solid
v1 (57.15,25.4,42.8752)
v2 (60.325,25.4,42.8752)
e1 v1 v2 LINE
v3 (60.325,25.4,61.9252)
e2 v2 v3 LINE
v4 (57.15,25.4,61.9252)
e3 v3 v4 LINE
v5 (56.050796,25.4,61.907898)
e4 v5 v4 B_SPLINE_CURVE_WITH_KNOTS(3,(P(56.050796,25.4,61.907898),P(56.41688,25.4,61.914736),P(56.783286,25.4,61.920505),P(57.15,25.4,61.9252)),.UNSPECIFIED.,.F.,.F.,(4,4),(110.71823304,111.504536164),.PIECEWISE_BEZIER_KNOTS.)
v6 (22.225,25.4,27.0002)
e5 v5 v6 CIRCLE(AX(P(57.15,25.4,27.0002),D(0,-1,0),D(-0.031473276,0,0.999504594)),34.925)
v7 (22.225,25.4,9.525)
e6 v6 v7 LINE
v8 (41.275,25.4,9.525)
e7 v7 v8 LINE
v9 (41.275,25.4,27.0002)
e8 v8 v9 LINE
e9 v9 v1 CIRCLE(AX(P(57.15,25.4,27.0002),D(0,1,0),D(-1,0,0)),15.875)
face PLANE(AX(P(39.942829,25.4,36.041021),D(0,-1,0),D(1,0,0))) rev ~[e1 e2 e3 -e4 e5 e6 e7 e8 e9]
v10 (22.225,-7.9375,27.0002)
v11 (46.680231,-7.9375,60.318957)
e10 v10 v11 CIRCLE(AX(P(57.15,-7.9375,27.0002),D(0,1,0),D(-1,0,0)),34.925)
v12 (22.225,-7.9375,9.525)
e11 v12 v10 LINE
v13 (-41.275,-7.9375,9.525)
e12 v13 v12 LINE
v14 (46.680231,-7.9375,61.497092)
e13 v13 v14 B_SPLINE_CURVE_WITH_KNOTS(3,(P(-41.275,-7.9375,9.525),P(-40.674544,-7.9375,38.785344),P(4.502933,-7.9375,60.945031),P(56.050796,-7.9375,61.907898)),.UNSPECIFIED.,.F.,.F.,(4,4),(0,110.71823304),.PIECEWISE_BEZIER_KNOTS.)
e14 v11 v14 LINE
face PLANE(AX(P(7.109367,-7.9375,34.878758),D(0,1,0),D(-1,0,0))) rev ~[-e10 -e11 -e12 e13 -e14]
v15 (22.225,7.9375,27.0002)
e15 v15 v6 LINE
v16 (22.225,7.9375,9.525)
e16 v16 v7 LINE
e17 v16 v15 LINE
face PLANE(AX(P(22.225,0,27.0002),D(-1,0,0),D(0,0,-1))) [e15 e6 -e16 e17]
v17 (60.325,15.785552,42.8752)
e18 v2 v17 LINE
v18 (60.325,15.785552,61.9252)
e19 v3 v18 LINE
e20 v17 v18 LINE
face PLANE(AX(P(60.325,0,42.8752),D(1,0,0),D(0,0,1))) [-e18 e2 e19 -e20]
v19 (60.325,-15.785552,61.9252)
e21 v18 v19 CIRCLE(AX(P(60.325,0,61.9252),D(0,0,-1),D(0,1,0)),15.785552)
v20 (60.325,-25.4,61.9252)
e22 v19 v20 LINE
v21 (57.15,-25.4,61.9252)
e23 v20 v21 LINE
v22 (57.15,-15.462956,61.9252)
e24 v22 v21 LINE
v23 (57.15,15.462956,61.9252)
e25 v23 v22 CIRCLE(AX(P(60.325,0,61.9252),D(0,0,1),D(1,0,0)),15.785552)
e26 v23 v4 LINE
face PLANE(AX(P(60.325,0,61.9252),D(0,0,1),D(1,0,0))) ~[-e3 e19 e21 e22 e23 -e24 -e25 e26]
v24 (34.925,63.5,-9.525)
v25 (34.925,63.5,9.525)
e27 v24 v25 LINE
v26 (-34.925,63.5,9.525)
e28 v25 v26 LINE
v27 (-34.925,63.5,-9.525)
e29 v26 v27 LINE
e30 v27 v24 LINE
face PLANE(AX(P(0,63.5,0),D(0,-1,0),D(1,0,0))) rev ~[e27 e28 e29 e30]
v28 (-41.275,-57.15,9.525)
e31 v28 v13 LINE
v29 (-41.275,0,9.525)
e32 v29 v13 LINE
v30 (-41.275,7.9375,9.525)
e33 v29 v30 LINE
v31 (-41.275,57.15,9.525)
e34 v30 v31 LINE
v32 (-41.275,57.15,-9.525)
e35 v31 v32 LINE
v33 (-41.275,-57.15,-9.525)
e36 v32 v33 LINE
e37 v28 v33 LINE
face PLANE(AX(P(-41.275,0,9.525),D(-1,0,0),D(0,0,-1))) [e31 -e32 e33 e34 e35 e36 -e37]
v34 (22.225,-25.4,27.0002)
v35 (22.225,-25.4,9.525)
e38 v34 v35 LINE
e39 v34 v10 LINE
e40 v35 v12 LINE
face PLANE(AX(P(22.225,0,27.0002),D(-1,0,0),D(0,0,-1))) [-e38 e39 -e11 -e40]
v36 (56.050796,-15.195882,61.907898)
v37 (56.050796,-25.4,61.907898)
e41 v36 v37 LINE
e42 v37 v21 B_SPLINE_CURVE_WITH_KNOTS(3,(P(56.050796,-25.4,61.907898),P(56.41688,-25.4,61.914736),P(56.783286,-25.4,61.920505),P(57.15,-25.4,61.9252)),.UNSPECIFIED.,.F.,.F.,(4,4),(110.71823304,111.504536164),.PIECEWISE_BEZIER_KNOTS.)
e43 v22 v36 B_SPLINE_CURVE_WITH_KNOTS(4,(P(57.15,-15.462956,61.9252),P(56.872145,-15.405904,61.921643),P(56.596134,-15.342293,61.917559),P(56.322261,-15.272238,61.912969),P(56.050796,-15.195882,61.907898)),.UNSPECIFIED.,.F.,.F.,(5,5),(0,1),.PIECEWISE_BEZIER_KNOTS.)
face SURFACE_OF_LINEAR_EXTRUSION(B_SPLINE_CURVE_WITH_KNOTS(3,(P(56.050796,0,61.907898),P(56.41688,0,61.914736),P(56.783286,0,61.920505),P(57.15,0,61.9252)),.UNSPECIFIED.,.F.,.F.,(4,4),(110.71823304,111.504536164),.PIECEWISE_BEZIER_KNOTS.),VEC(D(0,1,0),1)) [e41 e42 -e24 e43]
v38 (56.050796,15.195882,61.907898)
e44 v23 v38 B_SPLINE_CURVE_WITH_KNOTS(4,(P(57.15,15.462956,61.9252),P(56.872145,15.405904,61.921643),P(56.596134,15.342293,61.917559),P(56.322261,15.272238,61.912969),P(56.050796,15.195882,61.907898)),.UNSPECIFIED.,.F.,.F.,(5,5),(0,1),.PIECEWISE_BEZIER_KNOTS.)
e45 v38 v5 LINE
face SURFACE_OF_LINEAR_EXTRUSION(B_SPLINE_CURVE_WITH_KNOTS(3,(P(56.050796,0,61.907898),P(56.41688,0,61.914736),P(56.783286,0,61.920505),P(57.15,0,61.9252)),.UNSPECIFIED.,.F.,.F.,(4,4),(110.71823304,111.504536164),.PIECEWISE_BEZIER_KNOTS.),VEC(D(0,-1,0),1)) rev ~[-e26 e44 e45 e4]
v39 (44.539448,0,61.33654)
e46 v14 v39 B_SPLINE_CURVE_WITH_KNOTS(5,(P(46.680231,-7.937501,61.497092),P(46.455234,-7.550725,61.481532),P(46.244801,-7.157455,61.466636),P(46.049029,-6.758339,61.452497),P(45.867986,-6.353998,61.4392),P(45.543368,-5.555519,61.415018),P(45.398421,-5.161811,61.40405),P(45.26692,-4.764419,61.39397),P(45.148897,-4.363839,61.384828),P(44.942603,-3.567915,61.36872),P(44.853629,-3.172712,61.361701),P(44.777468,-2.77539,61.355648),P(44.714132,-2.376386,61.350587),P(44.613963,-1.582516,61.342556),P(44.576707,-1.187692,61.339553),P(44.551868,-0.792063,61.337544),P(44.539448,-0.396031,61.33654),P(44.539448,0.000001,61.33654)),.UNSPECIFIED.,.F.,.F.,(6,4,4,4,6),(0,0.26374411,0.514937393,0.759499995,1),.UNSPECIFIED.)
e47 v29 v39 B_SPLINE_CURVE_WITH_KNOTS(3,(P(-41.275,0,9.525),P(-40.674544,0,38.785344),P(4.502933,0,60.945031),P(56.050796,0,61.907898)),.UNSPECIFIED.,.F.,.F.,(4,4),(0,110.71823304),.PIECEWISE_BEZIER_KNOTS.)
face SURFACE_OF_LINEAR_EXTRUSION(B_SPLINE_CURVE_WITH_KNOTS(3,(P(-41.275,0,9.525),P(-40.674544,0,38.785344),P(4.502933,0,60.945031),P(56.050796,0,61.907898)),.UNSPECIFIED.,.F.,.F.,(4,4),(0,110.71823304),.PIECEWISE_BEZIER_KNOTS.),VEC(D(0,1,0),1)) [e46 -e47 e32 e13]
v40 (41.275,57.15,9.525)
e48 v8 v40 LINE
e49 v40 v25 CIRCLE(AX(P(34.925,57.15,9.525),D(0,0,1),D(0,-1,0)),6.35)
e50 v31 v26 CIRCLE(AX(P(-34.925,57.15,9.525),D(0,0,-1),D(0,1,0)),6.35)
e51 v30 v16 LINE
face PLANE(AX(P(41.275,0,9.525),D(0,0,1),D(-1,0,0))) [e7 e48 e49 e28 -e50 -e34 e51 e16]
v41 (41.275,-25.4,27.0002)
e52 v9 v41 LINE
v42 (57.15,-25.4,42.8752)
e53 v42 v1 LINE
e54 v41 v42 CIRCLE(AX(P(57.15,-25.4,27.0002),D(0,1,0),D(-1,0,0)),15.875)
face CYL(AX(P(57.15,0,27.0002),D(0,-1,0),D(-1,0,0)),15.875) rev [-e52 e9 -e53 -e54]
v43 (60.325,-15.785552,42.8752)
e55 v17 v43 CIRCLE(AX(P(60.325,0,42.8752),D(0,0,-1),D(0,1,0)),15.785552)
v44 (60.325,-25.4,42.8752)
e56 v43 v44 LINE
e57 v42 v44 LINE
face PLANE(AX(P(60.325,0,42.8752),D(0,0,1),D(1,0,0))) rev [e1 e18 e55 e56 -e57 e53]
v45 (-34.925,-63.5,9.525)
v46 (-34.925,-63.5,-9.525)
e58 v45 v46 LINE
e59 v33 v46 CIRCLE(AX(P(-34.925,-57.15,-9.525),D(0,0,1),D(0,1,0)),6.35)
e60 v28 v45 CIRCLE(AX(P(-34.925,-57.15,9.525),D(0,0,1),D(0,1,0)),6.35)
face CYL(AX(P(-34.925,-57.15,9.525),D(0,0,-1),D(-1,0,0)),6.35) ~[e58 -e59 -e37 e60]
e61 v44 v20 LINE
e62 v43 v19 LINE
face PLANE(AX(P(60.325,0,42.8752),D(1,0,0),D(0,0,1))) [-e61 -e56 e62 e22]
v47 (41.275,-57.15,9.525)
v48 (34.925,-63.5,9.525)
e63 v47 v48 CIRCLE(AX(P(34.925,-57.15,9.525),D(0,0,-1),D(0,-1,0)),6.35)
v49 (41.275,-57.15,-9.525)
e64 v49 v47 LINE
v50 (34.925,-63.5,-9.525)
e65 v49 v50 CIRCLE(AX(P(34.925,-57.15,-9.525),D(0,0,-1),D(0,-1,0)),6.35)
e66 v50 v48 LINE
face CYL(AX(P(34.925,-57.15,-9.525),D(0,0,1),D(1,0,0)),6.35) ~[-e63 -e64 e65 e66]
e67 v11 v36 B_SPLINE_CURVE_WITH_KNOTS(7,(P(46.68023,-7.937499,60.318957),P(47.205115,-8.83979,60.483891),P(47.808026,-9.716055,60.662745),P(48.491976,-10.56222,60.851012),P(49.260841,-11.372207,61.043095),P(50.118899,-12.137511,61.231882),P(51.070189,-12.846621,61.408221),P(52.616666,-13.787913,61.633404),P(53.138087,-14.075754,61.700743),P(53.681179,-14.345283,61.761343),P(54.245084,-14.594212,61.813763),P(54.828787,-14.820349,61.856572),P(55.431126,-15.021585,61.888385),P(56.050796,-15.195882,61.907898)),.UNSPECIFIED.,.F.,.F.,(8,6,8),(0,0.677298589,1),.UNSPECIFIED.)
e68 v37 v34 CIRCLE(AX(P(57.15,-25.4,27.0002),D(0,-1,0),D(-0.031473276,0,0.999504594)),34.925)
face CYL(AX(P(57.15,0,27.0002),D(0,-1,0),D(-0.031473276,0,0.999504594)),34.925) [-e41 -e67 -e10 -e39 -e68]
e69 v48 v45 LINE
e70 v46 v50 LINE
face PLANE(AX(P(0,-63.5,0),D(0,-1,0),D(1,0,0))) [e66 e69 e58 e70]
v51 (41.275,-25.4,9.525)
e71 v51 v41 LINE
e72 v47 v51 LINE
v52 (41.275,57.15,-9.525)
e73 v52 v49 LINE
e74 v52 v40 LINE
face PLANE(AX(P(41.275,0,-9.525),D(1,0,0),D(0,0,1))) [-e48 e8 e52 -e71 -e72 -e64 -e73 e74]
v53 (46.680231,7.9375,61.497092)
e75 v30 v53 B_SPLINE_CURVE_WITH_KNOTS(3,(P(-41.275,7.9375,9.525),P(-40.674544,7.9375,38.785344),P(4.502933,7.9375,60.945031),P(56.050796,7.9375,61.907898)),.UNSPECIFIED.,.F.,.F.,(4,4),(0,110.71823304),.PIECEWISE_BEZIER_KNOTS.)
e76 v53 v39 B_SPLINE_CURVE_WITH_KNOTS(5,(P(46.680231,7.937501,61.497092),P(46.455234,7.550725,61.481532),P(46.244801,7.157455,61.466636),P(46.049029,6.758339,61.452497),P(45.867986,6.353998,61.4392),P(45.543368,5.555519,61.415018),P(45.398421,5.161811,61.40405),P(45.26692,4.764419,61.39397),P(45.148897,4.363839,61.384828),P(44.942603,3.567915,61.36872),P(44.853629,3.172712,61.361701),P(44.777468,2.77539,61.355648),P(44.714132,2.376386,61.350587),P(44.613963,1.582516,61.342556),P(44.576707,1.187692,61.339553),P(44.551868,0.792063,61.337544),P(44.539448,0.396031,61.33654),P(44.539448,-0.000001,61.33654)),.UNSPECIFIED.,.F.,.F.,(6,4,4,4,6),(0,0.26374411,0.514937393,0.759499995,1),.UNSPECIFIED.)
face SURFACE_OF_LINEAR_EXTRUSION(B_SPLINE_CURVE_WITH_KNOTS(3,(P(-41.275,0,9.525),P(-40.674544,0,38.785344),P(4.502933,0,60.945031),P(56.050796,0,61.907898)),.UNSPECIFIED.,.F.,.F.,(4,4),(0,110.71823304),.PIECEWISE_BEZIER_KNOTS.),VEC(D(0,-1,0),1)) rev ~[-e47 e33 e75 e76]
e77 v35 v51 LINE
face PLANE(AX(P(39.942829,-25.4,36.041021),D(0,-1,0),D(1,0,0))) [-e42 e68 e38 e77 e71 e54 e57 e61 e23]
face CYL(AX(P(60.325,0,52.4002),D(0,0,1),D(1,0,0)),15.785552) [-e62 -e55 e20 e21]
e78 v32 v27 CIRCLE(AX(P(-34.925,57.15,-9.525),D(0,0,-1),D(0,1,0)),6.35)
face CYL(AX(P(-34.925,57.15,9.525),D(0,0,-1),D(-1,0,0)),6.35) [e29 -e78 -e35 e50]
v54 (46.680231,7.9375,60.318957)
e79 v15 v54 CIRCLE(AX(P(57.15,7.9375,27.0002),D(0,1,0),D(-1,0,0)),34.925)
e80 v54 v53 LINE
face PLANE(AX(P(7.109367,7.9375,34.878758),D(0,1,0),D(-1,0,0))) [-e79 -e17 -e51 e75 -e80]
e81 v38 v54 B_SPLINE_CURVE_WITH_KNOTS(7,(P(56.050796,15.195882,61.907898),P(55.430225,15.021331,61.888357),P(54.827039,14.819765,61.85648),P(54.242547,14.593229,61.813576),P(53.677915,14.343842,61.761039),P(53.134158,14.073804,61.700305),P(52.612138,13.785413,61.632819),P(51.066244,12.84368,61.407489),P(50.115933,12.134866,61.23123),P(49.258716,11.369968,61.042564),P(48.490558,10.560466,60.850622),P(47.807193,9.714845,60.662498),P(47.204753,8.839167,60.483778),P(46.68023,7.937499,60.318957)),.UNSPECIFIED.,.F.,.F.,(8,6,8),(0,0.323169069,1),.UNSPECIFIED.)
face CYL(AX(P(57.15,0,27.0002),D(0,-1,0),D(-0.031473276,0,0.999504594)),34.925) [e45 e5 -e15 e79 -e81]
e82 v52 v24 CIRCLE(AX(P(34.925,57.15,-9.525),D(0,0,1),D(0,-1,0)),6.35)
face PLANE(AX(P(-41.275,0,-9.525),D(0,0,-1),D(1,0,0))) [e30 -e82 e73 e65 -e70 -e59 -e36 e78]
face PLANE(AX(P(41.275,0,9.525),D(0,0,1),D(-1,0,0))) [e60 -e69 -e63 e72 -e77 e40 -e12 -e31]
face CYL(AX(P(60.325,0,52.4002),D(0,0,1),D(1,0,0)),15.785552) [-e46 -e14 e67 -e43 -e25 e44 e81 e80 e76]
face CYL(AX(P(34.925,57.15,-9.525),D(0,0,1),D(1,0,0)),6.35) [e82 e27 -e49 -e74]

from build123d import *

# Parameters (mm, degrees)
F1_DEPTH = 63.5
F2_DEPTH = 25.4
F3_DEPTH = 7.9375
F0_W     = 15.7855516109
F0_H     = 19.05
F5_R     = 6.35


with BuildPart() as f1:
    # F0 (on Front) → F1 (new body, symmetric)
    with BuildSketch(Plane.XZ):
        Polygon((-41.275, 9.525), (-41.275, -9.525), (41.275, -9.525), (41.275, 9.525), (22.225, 9.525), align=None)
    extrude(amount=F1_DEPTH, both=True)

    # F0 (on Front) → F2 (join, symmetric)
    with BuildSketch(Plane.XZ):
        with BuildLine():
            Line((22.225, 9.525), (41.275, 9.525))
            Line((41.275, 9.525), (41.275, 27.0002))
            ThreePointArc((41.275, 27.0002), (45.9246798487, 38.2255201513), (57.15, 42.8752))
            Line((57.15, 42.8752), (60.325, 42.8752))
            Line((60.325, 42.8752), (60.325, 61.9252))
            Line((60.325, 61.9252), (57.15, 61.9252))
            add(Edge.make_bspline(
                [(56.0507958514, 61.9078979367), (56.4168804985, 61.9147360597), (56.7832864431, 61.9205050971), (57.15, 61.9252)],
                knots=[110.7182330401, 110.7182330401, 110.7182330401, 110.7182330401, 111.5045361635, 111.5045361635, 111.5045361635, 111.5045361635], degree=3))
            ThreePointArc((56.0507958514, 61.9078979367), (32.0686789633, 51.3041700472), (22.225, 27.0002))
            Line((22.225, 27.0002), (22.225, 9.525))
        make_face()
    extrude(amount=F2_DEPTH, both=True)

    # F0 (on Front) → F3 (join, symmetric)
    with BuildSketch(Plane.XZ):
        with BuildLine():
            add(Edge.make_bspline(
                [(-41.275, 9.525), (-40.6745437573, 38.785344003), (4.5029333836, 60.945031492), (56.0507958514, 61.9078979367)],
                knots=[0, 0, 0, 0, 110.7182330401, 110.7182330401, 110.7182330401, 110.7182330401], degree=3))
            Line((-41.275, 9.525), (22.225, 9.525))
            Line((22.225, 9.525), (22.225, 27.0002))
            ThreePointArc((22.225, 27.0002), (32.0686789633, 51.3041700472), (56.0507958514, 61.9078979367))
        make_face()
    extrude(amount=F3_DEPTH, both=True)

    # F0 (on Front) → F4 (revolve)
    with BuildSketch(Plane.XZ):
        with Locations((68.2177758054, 52.4002)):
            Rectangle(F0_W, F0_H)
    revolve(axis=Axis((60.325, 0, 52.3875), (0, 0, 1)))

    # F5
    f5_edges = [f1.edges().sort_by_distance(p)[0] for p in [
        (41.275, -63.5, 0),
        (-41.275, -63.5, 0),
        (41.275, 63.5, 0),
        (-41.275, 63.5, 0),
    ]]
    fillet(f5_edges, radius=F5_R)


solid = f1.part
